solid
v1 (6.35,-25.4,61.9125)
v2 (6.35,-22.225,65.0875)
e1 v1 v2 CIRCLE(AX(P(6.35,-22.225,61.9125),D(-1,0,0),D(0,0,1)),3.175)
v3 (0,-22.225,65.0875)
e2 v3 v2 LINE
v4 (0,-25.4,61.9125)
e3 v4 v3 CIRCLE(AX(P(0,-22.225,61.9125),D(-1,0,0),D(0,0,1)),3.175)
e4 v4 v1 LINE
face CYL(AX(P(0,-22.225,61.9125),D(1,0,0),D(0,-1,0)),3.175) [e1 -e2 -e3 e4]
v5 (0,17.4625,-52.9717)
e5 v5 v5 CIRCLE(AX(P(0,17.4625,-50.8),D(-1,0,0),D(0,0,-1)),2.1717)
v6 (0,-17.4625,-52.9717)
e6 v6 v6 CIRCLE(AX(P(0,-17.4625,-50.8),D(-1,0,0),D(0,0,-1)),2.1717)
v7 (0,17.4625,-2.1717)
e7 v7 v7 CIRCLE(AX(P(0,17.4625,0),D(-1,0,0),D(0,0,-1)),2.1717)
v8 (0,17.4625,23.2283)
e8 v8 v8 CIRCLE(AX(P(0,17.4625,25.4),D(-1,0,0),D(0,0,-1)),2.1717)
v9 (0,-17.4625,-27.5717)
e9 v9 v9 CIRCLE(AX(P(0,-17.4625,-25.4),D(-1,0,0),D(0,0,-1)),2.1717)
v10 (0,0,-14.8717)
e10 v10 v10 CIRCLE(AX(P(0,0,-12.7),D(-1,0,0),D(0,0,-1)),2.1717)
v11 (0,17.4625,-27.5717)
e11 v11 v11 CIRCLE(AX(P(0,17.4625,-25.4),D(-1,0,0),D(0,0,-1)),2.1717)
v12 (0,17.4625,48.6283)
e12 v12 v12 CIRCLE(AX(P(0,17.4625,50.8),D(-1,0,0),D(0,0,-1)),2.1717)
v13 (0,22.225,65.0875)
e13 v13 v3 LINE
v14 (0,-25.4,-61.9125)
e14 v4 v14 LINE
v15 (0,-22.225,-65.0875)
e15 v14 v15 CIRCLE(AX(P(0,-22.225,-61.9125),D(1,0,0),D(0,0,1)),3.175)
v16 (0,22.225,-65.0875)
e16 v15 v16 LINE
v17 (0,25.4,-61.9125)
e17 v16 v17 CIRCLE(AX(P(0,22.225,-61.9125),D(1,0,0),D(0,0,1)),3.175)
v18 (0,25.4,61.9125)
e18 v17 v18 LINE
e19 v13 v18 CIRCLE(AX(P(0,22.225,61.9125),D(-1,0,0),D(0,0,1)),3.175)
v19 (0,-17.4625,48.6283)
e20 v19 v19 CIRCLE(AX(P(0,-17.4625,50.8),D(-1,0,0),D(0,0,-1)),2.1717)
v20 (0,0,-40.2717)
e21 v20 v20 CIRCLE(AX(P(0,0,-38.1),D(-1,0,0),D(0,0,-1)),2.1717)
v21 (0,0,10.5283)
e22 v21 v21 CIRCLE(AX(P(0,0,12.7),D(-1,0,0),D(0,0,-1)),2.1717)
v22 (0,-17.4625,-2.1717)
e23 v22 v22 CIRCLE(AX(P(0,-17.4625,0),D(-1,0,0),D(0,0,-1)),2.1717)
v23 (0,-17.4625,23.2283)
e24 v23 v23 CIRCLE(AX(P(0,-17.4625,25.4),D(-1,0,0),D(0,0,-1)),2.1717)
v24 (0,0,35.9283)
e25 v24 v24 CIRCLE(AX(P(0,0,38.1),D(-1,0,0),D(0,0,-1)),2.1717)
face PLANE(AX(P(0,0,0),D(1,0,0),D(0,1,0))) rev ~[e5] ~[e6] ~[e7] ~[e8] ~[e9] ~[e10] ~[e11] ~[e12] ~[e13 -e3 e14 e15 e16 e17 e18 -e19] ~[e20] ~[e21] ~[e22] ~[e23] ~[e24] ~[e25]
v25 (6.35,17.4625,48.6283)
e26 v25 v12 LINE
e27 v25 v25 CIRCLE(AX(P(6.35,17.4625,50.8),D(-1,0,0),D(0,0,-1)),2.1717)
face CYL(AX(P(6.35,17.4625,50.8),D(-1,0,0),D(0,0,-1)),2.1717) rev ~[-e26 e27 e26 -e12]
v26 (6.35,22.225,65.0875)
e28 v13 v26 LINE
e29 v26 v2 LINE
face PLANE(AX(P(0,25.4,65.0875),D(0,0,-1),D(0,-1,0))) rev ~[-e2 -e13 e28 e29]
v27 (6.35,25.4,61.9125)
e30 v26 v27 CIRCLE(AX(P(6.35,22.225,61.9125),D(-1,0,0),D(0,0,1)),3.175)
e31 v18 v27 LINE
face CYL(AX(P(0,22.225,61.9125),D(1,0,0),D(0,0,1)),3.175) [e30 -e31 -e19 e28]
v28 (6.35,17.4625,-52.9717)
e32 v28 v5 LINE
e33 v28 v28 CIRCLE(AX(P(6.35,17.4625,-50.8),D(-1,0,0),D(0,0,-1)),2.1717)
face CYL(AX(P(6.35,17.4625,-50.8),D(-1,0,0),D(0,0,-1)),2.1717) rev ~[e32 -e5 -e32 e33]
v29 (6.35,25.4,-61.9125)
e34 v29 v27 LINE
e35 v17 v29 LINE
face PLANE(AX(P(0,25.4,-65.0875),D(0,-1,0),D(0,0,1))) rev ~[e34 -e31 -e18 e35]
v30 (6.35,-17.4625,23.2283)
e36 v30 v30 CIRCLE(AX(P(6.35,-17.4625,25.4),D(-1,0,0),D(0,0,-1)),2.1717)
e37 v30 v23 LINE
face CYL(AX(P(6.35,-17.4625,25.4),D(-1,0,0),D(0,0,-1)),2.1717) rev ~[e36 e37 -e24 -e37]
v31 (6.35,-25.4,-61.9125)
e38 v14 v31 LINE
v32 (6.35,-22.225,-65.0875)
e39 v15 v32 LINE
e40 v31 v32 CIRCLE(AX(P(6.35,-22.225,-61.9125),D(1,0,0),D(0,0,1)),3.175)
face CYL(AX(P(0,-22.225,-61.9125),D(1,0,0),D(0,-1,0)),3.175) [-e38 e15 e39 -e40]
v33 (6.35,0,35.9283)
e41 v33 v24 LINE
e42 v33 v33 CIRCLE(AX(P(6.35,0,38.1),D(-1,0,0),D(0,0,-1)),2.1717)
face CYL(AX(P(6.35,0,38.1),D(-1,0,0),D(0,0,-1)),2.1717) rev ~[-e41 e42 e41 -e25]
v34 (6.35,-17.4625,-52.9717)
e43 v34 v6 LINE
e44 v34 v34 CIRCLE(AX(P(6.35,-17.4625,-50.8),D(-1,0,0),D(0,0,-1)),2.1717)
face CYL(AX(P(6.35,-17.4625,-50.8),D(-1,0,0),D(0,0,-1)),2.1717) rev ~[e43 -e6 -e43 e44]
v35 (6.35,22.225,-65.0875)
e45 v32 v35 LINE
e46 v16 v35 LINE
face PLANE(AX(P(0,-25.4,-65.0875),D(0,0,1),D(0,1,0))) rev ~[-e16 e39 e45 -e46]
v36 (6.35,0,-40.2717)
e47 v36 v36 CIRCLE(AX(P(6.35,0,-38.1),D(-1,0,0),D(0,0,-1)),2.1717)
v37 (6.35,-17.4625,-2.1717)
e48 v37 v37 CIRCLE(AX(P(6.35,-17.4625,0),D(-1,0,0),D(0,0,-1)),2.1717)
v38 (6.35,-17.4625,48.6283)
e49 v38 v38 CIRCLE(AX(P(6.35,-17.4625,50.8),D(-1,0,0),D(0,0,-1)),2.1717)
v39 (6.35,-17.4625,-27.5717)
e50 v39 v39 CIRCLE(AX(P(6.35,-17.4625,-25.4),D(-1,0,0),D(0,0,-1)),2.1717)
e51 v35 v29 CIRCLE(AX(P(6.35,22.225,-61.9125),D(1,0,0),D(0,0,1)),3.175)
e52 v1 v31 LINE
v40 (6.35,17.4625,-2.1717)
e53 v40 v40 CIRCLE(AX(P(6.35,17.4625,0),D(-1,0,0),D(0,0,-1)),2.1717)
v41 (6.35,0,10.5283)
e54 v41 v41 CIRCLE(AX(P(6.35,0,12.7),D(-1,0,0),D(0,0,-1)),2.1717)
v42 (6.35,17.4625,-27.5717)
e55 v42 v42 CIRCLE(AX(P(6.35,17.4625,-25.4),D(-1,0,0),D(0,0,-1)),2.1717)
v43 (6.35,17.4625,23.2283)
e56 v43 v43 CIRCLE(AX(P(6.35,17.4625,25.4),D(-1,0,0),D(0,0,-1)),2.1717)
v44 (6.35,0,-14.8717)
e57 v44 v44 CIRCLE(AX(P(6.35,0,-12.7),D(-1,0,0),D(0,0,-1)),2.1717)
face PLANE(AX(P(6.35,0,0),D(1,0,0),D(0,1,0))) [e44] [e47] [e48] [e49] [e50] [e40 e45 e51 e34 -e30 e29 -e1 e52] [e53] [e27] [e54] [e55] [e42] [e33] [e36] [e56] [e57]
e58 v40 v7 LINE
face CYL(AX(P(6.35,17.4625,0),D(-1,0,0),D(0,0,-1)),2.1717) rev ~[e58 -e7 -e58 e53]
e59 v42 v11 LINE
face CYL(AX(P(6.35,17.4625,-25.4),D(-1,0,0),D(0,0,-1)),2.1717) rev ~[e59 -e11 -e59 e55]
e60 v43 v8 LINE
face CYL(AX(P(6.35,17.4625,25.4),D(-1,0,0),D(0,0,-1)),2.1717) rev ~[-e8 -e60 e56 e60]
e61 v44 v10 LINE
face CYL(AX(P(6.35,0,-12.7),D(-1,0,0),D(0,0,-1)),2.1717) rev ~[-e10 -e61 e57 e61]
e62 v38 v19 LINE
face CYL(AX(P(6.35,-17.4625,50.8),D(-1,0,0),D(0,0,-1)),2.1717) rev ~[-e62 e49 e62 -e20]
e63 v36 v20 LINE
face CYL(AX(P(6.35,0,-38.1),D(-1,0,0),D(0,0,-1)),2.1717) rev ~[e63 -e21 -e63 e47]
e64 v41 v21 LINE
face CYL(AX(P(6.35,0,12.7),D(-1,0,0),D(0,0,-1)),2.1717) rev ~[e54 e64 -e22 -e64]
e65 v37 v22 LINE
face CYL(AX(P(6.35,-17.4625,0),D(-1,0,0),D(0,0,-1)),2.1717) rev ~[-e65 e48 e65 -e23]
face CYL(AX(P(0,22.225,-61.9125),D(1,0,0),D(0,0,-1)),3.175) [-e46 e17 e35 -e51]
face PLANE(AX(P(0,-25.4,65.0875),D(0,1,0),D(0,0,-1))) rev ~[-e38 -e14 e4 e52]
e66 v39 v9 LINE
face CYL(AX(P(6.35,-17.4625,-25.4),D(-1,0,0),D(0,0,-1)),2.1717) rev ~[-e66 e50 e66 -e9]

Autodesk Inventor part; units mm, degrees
ref_plane "YZ Plane" through (0, 0, 0) normal (1, 0, 0) x (0, 1, 0)
ref_plane "XZ Plane" through (0, 0, 0) normal (0, 1, 0) x (-1, 0, 0)
ref_plane "XY Plane" through (0, 0, 0) normal (0, 0, 1) x (1, 0, 0)
sketch "Sketch1" plane through (0, 0, 0) normal (1, 0, 0) x (0, 1, 0)
  line L0 (-25.4, -65.0875) -> (25.4, -65.0875)
  line L1 (25.4, -65.0875) -> (25.4, 65.0875)
  line L2 (25.4, 65.0875) -> (-25.4, 65.0875)
  line L3 (-25.4, 65.0875) -> (-25.4, -65.0875)
  line L4 (-25.4, -65.0875) -> (25.4, 65.0875) construction
  line L5 (25.4, -65.0875) -> (-25.4, 65.0875) construction
  point P0 (0, 0)
  dimension "d0" = 130.175
  dimension "d1" = 50.8
extrude "Extrusion1" add sketch "Sketch1" along normal blind 6.35
sketch "Sketch2" plane through (6.35, 0, 0) normal (1, 0, 0) x (0, 0, -1)
  line L0 (-50.8, 17.4625) -> (-50.8, -17.4625) construction
  line L1 (-65.0875, 25.4) -> (-65.0875, -25.4) construction
  line L2 (65.0875, 25.4) -> (65.0875, -25.4) construction
  line L3 (65.0875, -25.4) -> (-65.0875, -25.4) construction
  line L4 (-65.0875, 25.4) -> (65.0875, 25.4) construction
  line L5 (-65.0875, -25.4) -> (-65.0875, 25.4) projected
  point P0 (0, 0)
  point P1 (-38.1, 0)
  point P2 (-50.8, 0)
  point P3 (-65.0875, 0)
  point P4 (-25.4, 17.4625)
  point P5 (-12.7, 0)
  point P6 (-25.4, -17.4625)
  point P7 (0, 17.4625)
  point P8 (12.7, 0)
  point P9 (0, -17.4625)
  point P10 (25.4, 17.4625)
  point P11 (38.1, 0)
  point P12 (25.4, -17.4625)
  point P13 (50.8, 17.4625)
  point P14 (63.5, 0)
  point P15 (50.8, -17.4625)
  dimension "d6" = 34.925
  dimension "d7" = 14.2875
  dimension "d8" = 12.7
  dimension "d11" = 25.4
hole "Hole1" at (6.35, -17.4625, 50.8) at (6.35, 17.4625, 50.8) at (6.35, 0, 38.1) at (6.35, 17.4625, 25.4) at (6.35, 0, 12.7) at (6.35, -17.4625, 25.4) at (6.35, 17.4625, 0) at (6.35, 0, -12.7) at (6.35, -17.4625, 0) at (6.35, 17.4625, -25.4) at (6.35, -17.4625, -25.4) at (6.35, 0, -38.1) at (6.35, 17.4625, -50.8) at (6.35, -17.4625, -50.8) direction (-1, 0, 0) diameter 4.3434 end through all thread size "12-24 UNC" class "2B" standard "ANSI Unified Screw Threads"
fillet "Fillet1" radius 3.175 4 edges at (3.175, 25.4, 65.0875) (3.175, 25.4, -65.0875) (3.175, -25.4, -65.0875) (3.175, -25.4, 65.0875)
properties part number "CL4-021" material "Aluminum 6061"
